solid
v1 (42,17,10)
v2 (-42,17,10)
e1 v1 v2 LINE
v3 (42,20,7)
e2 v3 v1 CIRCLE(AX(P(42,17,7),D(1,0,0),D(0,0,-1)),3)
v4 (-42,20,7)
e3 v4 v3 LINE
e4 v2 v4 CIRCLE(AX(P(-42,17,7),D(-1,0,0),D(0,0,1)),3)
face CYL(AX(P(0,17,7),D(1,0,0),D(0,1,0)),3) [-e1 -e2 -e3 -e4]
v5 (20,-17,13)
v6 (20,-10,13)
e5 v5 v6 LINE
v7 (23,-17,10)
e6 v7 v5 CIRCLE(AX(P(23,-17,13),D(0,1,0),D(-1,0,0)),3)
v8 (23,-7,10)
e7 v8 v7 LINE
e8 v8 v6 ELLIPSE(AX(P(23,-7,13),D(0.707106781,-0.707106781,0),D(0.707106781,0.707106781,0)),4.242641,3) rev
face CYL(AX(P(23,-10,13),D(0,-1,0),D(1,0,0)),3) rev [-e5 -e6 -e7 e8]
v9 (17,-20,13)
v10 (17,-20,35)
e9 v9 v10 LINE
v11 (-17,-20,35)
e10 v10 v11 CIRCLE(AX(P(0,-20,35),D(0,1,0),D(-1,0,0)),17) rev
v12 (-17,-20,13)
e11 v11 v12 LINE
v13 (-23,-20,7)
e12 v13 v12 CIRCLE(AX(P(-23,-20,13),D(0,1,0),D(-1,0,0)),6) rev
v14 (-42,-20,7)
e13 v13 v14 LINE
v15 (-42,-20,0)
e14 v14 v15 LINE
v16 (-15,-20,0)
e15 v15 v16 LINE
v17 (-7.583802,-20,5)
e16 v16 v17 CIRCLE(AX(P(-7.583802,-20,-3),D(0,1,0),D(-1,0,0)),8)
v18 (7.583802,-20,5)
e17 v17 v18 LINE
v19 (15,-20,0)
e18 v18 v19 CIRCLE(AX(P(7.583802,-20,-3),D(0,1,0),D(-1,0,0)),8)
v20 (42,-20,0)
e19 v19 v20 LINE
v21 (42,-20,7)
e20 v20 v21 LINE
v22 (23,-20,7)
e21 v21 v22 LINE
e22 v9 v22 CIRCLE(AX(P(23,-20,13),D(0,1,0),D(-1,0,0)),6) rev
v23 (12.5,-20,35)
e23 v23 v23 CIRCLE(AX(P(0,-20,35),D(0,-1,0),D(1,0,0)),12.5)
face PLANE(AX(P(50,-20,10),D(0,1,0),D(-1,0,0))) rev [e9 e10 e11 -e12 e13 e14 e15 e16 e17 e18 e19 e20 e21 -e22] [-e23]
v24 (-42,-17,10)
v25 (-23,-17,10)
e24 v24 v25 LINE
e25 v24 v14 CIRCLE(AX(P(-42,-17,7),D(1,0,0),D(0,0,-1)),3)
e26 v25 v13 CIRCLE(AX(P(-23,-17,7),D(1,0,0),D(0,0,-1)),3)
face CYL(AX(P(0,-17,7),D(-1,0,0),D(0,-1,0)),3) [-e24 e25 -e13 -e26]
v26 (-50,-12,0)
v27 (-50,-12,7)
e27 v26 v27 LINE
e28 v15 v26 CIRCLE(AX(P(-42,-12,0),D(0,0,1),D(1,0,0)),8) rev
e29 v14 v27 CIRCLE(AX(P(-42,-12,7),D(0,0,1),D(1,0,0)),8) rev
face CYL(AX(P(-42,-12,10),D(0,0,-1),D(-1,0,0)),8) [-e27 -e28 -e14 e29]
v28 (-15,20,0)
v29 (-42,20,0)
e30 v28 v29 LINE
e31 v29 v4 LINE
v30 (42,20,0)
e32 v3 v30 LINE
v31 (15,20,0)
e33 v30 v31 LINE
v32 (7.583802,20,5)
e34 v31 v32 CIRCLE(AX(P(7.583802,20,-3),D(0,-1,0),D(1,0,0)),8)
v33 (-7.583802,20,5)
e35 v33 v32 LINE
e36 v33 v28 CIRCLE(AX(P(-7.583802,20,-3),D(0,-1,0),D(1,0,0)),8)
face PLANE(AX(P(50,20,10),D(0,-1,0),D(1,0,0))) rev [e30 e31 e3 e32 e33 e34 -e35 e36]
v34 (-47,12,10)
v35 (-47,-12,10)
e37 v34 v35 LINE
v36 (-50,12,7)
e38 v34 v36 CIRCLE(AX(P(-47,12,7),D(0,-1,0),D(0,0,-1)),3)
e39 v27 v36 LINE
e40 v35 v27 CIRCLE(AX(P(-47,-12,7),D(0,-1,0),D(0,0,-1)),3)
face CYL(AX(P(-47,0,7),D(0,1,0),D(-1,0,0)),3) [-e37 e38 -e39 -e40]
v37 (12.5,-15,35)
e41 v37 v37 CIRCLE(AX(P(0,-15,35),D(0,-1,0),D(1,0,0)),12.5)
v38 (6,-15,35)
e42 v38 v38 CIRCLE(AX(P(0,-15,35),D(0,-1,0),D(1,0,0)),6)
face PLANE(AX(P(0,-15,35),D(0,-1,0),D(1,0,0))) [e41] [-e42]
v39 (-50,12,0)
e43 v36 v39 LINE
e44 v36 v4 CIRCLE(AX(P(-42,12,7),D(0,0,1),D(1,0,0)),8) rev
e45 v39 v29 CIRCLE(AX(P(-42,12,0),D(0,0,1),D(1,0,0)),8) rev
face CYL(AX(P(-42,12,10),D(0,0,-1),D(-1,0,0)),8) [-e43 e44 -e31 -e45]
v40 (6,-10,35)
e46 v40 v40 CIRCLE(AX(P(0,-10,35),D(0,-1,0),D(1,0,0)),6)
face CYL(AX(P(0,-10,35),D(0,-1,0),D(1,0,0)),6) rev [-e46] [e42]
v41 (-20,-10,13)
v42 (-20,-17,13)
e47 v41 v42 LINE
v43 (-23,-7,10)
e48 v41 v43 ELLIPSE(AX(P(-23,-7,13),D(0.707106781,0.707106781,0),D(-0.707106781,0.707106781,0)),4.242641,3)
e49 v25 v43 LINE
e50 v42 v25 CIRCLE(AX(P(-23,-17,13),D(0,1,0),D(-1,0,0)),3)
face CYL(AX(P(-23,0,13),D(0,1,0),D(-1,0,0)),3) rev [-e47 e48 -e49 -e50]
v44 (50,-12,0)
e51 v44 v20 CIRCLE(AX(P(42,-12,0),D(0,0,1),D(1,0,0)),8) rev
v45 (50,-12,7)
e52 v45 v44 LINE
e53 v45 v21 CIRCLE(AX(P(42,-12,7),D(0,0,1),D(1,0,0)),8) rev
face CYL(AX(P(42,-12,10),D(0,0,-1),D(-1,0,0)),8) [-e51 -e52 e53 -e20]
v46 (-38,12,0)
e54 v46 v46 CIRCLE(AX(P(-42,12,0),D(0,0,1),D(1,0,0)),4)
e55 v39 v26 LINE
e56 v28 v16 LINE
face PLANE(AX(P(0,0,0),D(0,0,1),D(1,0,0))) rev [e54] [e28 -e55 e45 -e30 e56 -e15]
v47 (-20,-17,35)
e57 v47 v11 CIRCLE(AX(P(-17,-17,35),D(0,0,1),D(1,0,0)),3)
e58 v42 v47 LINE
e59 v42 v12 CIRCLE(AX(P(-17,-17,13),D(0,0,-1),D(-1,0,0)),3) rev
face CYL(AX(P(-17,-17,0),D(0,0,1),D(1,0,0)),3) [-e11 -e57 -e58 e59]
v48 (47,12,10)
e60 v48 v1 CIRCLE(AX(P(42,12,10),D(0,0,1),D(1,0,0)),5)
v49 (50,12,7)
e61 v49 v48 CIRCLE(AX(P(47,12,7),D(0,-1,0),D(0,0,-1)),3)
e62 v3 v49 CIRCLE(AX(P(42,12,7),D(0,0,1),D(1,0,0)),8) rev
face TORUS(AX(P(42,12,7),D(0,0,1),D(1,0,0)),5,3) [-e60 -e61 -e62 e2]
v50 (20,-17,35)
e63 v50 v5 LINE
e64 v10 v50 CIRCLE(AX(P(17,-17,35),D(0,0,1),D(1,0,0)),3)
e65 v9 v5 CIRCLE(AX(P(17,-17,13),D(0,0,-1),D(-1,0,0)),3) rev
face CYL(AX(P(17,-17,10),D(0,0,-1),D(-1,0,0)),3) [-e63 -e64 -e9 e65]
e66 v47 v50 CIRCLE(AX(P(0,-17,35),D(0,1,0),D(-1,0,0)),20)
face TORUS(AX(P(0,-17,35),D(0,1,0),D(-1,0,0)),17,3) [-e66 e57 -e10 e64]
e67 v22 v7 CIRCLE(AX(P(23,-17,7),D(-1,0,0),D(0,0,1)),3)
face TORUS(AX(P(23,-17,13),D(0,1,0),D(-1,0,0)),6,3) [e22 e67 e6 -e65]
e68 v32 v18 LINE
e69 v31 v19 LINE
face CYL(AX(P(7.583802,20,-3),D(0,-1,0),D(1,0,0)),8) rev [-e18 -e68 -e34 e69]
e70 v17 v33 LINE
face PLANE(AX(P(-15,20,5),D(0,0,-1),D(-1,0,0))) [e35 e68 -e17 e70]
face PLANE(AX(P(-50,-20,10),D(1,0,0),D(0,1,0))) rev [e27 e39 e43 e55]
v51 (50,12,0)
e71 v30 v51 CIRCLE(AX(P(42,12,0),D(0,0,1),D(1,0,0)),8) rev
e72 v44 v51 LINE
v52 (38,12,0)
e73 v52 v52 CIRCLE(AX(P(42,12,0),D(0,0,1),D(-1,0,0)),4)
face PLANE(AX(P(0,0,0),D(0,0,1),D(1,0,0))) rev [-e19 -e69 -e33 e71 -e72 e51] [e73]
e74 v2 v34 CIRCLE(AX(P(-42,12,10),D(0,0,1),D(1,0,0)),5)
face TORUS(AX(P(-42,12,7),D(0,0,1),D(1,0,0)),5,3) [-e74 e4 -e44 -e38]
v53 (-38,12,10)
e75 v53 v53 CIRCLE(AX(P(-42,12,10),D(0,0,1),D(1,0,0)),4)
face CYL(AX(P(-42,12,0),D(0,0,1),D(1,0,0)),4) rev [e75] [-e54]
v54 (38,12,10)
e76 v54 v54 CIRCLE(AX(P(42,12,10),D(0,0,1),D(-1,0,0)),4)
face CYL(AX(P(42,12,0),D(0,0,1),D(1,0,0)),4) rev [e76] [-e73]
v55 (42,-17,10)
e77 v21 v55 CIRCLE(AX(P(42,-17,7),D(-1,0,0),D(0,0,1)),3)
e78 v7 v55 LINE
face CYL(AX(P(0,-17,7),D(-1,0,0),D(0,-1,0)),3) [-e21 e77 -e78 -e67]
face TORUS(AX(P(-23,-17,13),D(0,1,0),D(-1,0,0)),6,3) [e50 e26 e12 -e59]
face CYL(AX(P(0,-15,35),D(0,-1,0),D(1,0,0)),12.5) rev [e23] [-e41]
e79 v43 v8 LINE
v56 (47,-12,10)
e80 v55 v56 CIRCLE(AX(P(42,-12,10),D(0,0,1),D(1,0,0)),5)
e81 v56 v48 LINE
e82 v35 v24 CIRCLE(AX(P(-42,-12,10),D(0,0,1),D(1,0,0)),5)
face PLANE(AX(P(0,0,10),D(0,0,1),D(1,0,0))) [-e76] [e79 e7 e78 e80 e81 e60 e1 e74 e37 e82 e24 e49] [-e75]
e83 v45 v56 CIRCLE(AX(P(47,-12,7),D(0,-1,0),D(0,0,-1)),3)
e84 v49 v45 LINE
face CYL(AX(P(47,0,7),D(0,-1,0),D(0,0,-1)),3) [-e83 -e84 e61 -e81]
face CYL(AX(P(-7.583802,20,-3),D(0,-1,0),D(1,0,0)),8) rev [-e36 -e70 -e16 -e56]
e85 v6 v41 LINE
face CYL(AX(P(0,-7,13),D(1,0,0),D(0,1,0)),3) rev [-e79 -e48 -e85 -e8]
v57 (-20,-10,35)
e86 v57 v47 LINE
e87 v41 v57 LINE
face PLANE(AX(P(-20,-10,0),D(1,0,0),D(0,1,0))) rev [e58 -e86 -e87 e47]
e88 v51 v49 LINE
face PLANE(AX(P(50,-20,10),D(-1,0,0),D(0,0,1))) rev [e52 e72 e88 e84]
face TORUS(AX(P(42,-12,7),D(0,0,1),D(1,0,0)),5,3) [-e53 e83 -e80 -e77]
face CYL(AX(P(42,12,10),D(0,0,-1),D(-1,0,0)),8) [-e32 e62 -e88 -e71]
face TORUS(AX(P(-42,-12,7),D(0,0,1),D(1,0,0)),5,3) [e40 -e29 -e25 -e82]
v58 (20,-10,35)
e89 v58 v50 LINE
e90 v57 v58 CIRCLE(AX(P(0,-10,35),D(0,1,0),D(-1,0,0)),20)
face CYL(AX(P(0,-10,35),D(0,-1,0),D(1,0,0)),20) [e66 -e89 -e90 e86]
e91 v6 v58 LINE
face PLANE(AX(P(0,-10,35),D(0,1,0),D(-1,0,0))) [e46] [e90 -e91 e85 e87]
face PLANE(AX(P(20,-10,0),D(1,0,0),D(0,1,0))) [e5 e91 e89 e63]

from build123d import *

# Parameters (mm, degrees)
SKETCH_1_W          = 100
SKETCH_1_H          = 40
EXTRUDE_1_DEPTH     = 10
EXTRUDE_2_DEPTH     = 10
SKETCH_4_R          = 12.5
CUT_EXTRUDE_1_DEPTH = 5
SKETCH_5_R          = 6
CUT_EXTRUDE_2_DEPTH = 5
SKETCH_6_W          = 30
SKETCH_6_H          = 5
CUT_EXTRUDE_3_DEPTH = 85.409715081
FILLET_1_R          = 8
FILLET_2_R          = 3
SKETCH_7_R          = 4
CUT_EXTRUDE_5_DEPTH = 71.178344238


with BuildPart() as part:
    # Эскиз1 → Бобышка-Вытянуть1 (new body)
    with BuildSketch(Plane.XY):
        Rectangle(SKETCH_1_W, SKETCH_1_H)
    extrude(amount=EXTRUDE_1_DEPTH)

    # Эскиз2 → Бобышка-Вытянуть2 (add)
    with BuildSketch(Plane.XZ.offset(20)):
        with BuildLine():
            Line((-20, 0), (-20, 35))
            ThreePointArc((-20, 35), (0, 55), (20, 35))
            Line((20, 35), (20, 0))
            Line((20, 0), (-20, 0))
        make_face()
    extrude(amount=-EXTRUDE_2_DEPTH)

    # Эскиз4 → Вырез-Вытянуть1 (cut)
    with BuildSketch(Plane.XZ.offset(20)):
        with Locations((0, 35)):
            Circle(SKETCH_4_R)
    extrude(amount=-CUT_EXTRUDE_1_DEPTH, mode=Mode.SUBTRACT)

    # Эскиз5 → Вырез-Вытянуть2 (cut)
    with BuildSketch(Plane.XZ.offset(15)):
        with Locations((0, 35)):
            Circle(SKETCH_5_R)
    extrude(amount=-CUT_EXTRUDE_2_DEPTH, mode=Mode.SUBTRACT)

    # Эскиз6 → Вырез-Вытянуть3 (cut, through all)
    with BuildSketch(Plane.XZ.offset(20)):
        with Locations((0, 2.5)):
            Rectangle(SKETCH_6_W, SKETCH_6_H)
    extrude(amount=-CUT_EXTRUDE_3_DEPTH, mode=Mode.SUBTRACT)

    # Скругление1
    # the kernel refuses this fillet: 8 mm, written as the material it adds along each edge
    with BuildSketch(Plane(origin=(-15, -20, 5), x_dir=(1, 0, 0), z_dir=(0, 1, 0))) as fillet_1_piece_1:
        with BuildLine():
            CenterArc((7.416198487, 8), FILLET_1_R, 202.024312837, 67.975687163)
            Line((0, 5), (0, 0))
            Line((0, 0), (7.416198487, 0))
        make_face()
    extrude(amount=40)
    with BuildSketch(Plane(origin=(15, -20, 5), x_dir=(0, 0, -1), z_dir=(0, 1, 0))) as fillet_1_piece_2:
        with BuildLine():
            CenterArc((8, 7.416198487), FILLET_1_R, 180, 67.975687163)
            Line((0, 7.416198487), (0, 0))
            Line((0, 0), (5, 0))
        make_face()
    extrude(amount=40)
    # the kernel refuses this fillet: 8 mm, written as the material it takes off along each edge
    with BuildSketch(Plane(origin=(50, -20, -20), x_dir=(-1, 0, 0), z_dir=(0, 0, 1)), Plane(origin=(50, 20, -20), x_dir=(0, -1, 0), z_dir=(0, 0, 1))) as fillet_1_2_piece_1:
        with BuildLine():
            CenterArc((FILLET_1_R, -FILLET_1_R), FILLET_1_R, 90, 90)
            Line((0, -FILLET_1_R), (0, 0))
            Line((0, 0), (FILLET_1_R, 0))
        make_face()
    extrude(amount=50, mode=Mode.SUBTRACT)
    with BuildSketch(Plane(origin=(-50, -20, -20), x_dir=(1, 0, 0), z_dir=(0, 0, 1)), Plane(origin=(-50, 20, -20), x_dir=(0, -1, 0), z_dir=(0, 0, 1))) as fillet_1_2_piece_2:
        with BuildLine():
            CenterArc((FILLET_1_R, FILLET_1_R), FILLET_1_R, 180, 90)
            Line((0, FILLET_1_R), (0, 0))
            Line((0, 0), (FILLET_1_R, 0))
        make_face()
    extrude(amount=50, mode=Mode.SUBTRACT)

    # Скругление2
    fillet_2_edges = [part.edges().sort_by_distance(p)[0] for p in [
        (31, -20, 10),
        (-20, -15, 10),
        (-20, -20, 22.5),
        (0, -20, 55),
        (20, -15, 10),
        (0, -10, 10),
        (20, -20, 22.5),
        (50, 0, 10),
        (-31, -20, 10),
        (0, 20, 10),
        (-50, 0, 10),
        (47.656854249, 17.656854249, 10),
        (-47.656854249, 17.656854249, 10),
        (-47.656854249, -17.656854249, 10),
        (47.656854249, -17.656854249, 10),
    ]]
    fillet(fillet_2_edges, radius=FILLET_2_R)

    # Эскиз7 → Вырез-Вытянуть5 (cut, through all)
    with BuildSketch(Plane.XY.offset(10)):
        with Locations((-42, 12)):
            Circle(SKETCH_7_R)
        with Locations(Location((42, 12, 0), (0, 0, 180))):
            Circle(SKETCH_7_R)
    extrude(amount=-CUT_EXTRUDE_5_DEPTH, mode=Mode.SUBTRACT)


solid = part.part
